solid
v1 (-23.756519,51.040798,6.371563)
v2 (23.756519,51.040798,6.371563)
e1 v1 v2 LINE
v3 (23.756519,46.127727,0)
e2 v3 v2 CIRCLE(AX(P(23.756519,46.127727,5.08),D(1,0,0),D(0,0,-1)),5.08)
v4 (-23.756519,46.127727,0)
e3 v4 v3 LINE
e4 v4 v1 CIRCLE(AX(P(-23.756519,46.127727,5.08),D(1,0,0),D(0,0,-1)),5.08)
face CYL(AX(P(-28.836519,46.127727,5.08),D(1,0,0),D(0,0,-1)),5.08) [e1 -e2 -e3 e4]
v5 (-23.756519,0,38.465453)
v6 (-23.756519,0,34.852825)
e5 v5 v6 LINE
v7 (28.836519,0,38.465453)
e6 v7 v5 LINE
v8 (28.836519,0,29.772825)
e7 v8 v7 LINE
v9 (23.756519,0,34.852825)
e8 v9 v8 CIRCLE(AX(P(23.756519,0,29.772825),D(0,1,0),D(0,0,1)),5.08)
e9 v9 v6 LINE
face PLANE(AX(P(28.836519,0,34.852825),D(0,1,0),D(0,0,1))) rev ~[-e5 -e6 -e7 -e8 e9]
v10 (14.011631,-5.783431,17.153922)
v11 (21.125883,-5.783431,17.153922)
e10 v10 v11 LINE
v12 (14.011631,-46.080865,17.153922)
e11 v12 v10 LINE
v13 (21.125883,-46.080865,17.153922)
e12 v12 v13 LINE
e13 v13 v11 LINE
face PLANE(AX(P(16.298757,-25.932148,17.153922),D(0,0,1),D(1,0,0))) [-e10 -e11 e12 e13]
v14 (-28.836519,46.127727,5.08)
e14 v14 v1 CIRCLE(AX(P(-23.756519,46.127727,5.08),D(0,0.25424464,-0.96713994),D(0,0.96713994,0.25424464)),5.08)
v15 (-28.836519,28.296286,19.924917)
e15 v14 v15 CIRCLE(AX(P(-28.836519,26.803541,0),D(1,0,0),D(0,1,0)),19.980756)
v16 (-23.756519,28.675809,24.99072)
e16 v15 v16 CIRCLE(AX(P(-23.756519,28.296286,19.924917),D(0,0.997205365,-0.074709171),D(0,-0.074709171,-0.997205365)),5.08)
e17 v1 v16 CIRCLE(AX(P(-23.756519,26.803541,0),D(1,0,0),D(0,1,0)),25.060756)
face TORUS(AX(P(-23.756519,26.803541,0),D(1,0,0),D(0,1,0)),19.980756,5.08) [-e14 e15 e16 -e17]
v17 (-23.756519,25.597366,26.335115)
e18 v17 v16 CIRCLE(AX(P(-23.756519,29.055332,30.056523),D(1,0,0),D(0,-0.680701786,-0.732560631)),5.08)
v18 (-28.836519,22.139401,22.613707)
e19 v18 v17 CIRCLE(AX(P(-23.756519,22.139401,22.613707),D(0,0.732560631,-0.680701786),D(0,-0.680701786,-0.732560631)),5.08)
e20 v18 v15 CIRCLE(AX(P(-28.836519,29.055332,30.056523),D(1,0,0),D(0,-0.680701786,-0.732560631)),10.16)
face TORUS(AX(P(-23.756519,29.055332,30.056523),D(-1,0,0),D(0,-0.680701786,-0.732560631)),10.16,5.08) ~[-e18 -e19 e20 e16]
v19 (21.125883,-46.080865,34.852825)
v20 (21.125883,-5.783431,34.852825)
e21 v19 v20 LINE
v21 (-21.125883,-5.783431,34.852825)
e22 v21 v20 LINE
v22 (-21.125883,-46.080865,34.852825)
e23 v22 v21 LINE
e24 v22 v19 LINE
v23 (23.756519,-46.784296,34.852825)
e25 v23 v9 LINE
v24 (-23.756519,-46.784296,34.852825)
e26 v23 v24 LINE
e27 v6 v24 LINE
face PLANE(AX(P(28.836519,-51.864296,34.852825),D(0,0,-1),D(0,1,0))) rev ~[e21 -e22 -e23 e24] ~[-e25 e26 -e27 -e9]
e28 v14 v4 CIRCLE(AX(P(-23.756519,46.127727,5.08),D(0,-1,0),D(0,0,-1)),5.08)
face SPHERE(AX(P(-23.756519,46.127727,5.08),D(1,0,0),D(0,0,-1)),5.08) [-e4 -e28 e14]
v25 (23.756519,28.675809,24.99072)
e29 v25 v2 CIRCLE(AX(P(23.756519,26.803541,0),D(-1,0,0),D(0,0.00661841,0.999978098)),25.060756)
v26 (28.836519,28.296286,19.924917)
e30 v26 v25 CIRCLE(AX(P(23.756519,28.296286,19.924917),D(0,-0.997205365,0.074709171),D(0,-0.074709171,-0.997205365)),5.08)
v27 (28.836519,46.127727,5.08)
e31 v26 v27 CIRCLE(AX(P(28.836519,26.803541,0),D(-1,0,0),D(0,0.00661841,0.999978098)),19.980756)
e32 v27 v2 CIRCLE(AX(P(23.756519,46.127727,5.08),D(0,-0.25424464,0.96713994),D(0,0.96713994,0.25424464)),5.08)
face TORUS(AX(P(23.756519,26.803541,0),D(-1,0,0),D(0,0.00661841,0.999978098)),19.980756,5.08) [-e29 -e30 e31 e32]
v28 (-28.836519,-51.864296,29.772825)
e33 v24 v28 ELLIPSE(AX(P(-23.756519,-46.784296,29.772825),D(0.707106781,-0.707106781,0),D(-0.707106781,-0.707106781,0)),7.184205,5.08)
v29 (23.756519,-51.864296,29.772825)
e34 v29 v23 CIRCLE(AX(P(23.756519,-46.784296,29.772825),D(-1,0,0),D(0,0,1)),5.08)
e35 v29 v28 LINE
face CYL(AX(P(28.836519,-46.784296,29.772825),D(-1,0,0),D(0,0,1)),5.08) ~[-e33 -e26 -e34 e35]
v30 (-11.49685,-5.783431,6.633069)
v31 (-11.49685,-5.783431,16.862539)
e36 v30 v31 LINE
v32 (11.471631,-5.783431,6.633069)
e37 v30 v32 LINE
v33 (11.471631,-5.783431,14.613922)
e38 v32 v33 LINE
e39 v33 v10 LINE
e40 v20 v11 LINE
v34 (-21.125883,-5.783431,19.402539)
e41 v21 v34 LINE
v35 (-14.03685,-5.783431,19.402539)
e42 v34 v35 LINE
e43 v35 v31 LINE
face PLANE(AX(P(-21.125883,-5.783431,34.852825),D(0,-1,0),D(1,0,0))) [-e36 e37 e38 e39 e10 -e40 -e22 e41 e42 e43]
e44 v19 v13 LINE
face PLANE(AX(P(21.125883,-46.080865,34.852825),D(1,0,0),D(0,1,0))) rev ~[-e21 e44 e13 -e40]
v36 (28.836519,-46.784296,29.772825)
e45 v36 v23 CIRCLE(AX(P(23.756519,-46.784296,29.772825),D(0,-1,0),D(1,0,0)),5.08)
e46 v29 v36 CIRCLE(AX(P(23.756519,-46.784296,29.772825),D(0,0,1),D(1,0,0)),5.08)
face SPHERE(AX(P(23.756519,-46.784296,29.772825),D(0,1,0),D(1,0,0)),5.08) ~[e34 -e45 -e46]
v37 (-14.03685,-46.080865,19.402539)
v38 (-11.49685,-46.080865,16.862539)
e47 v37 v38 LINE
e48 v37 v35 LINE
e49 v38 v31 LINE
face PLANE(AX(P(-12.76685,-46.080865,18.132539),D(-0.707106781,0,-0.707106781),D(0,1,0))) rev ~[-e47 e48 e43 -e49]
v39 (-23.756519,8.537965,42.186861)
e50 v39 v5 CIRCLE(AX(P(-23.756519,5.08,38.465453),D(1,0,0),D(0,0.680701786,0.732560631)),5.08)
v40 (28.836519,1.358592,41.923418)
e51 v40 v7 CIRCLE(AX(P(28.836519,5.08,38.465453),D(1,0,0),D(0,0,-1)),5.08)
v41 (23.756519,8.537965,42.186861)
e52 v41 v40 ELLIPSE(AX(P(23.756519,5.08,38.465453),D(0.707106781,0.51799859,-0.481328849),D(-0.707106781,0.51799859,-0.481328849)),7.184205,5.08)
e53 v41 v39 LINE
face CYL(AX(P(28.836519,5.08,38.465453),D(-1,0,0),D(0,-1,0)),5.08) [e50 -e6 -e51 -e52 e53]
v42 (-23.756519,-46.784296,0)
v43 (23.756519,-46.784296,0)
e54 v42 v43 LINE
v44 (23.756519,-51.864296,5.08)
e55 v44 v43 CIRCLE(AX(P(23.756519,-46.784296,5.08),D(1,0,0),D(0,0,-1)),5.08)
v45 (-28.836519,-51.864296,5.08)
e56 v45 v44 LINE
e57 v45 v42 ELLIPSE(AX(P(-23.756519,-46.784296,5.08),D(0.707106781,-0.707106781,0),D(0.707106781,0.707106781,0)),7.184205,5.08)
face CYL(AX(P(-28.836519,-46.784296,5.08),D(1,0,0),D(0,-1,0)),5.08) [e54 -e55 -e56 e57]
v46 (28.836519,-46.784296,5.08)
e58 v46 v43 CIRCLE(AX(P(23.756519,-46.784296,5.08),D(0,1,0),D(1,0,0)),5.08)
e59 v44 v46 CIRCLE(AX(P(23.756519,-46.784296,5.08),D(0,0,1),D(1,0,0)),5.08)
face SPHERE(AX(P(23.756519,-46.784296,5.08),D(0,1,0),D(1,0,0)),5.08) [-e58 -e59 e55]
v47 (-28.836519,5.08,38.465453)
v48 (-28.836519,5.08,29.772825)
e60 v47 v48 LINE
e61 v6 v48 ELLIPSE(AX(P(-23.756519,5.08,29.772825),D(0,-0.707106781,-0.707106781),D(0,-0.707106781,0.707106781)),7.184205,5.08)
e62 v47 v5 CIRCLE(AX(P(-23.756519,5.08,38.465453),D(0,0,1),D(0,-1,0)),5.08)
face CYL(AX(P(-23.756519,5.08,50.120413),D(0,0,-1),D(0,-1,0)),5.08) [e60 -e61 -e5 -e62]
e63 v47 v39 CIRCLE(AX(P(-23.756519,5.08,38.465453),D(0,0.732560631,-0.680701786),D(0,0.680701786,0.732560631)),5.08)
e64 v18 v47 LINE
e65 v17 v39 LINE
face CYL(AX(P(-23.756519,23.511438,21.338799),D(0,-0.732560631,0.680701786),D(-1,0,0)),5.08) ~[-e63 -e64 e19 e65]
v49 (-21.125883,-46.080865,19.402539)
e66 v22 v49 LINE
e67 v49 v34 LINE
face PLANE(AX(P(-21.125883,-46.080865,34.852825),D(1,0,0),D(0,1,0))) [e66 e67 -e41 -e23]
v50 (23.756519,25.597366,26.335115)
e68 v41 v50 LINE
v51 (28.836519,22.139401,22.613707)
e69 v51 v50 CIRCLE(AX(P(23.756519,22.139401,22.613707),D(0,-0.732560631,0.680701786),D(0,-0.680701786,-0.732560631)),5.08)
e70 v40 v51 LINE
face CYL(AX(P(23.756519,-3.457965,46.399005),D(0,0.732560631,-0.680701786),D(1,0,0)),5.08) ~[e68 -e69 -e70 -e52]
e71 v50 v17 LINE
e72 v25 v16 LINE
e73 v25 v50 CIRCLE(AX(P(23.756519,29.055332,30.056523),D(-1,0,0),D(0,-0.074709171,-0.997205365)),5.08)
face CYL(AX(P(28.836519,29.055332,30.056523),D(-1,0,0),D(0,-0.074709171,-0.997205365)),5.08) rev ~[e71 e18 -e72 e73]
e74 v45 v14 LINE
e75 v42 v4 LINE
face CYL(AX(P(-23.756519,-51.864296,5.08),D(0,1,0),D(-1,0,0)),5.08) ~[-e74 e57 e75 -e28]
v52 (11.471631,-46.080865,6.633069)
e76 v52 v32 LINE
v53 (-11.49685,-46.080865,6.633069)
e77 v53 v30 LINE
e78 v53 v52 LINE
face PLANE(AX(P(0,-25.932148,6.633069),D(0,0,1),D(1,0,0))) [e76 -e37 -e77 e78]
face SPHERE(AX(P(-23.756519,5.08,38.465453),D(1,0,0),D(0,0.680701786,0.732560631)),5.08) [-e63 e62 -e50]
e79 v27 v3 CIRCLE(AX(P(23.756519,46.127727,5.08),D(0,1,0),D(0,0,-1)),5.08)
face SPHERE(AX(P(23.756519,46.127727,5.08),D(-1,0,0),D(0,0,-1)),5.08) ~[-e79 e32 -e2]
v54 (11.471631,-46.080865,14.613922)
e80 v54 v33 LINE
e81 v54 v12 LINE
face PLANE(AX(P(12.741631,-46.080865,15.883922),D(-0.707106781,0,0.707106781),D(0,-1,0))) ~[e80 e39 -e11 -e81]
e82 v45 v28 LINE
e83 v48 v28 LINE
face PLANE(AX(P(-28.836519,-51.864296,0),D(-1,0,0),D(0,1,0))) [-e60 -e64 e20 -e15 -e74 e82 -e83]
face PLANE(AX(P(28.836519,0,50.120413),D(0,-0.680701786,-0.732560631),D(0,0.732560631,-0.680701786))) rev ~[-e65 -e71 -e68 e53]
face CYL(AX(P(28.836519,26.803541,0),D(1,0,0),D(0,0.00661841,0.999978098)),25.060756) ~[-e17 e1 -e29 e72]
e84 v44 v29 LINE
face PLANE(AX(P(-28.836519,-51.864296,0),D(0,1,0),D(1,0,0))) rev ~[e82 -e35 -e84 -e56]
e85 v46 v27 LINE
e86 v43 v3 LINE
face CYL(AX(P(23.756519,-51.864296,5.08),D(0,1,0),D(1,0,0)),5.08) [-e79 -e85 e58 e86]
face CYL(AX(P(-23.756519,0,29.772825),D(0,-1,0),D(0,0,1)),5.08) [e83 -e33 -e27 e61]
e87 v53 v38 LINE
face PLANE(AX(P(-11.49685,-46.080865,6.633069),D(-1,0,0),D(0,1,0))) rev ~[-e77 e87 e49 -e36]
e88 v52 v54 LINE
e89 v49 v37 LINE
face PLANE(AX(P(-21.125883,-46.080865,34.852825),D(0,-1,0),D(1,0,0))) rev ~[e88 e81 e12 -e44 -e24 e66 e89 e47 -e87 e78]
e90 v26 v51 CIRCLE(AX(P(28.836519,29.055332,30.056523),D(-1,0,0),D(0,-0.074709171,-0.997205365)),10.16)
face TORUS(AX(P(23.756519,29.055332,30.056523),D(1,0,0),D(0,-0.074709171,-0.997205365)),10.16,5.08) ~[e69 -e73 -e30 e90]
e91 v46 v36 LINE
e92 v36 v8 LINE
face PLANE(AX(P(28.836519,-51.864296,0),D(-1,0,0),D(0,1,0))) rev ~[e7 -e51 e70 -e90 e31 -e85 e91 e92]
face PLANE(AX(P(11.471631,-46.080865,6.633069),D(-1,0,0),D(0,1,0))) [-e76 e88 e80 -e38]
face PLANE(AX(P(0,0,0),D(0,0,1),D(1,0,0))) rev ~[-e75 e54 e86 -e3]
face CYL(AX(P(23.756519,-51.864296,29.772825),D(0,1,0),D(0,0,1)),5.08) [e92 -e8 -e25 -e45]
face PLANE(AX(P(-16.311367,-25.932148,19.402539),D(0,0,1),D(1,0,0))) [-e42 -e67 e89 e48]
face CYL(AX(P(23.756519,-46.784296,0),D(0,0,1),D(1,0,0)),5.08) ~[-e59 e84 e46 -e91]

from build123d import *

# Parameters (mm, degrees)
F0_W     = 57.6730370522
F0_H     = 103.7285923958
F1_DEPTH = 50.1204133034
F2_W     = 51.8642961979
F2_H     = 15.2675881982
F3_DEPTH = 280.9666395187
F4_W     = 42.251765728
F4_H     = 40.2974346653
F5_DEPTH = 28.219755739
F6_W     = 9.6290325746
F6_H     = 40.2974346653
F7_DEPTH = 12.7694699913
F8_W     = 9.6542518586
F8_H     = 40.2974346653
F9_DEPTH = 10.5208531022
F10_R    = 5.08
F11_SIZE = 2.54


with BuildPart() as f1:
    # F0 (on Top) → F1 (new body)
    with BuildSketch(Plane.XY):
        Rectangle(F0_W, F0_H)
    extrude(amount=F1_DEPTH)

    # F2 (on face) → F3 (cut)
    with BuildSketch(Plane.YZ.offset(28.8365185261)):
        with BuildLine():
            ThreePointArc((26.9694030285, 25.0602066517), (44.5827153367, 17.6618916268), (51.8642961979, 0))
            Line((51.8642961979, 0), (51.8642961979, 50.1204133034))
            Line((51.8642961979, 50.1204133034), (0, 50.1204133034))
            Line((0, 50.1204133034), (26.9694030285, 25.0602066517))
        make_face()
        with Locations((-25.9321480989, 42.4866192043)):
            Rectangle(F2_W, F2_H)
    extrude(amount=-F3_DEPTH, mode=Mode.SUBTRACT)

    # F4 (on face) → F5 (cut)
    with BuildSketch(Plane.XY.offset(34.8528251052)):
        with Locations((0, -25.9321480989)):
            Rectangle(F4_W, F4_H)
    extrude(amount=-F5_DEPTH, mode=Mode.SUBTRACT)

    # F6 (on face) → F7 (join)
    with BuildSketch(Plane.XY.offset(6.6330693662)):
        with Locations((-16.3113665767, -25.9321480989)):
            Rectangle(F6_W, F6_H)
    extrude(amount=F7_DEPTH)

    # F8 (on face) → F9 (join)
    with BuildSketch(Plane.XY.offset(6.6330693662)):
        with Locations((16.2987569347, -25.9321480989)):
            Rectangle(F8_W, F8_H)
    extrude(amount=F9_DEPTH)

    # F10
    f10_edges = [f1.edges().sort_by_distance(p)[0] for p in [
        (28.836519, 44.582715, 17.661892),
        (28.836519, 13.484702, 37.59031),
        (0, 26.969403, 25.060207),
        (-28.836519, 13.484702, 37.59031),
        (-28.836519, 44.582715, 17.661892),
        (0, 51.864296, 0),
        (28.836519, 0, 0),
        (28.836519, -25.932148, 34.852825),
        (28.836519, -51.864296, 17.426413),
        (-28.836519, -25.932148, 34.852825),
        (0, -51.864296, 34.852825),
        (0, -51.864296, 0),
        (-28.836519, 0, 0),
        (-28.836519, 0, 42.486619),
        (0, 0, 50.120413),
    ]]
    fillet(f10_edges, radius=F10_R)

    # F11
    f11_edges = [f1.edges().sort_by_distance(p)[0] for p in [
        (-11.49685, -25.932148, 19.402539),
        (11.471631, -25.932148, 17.153922),
    ]]
    chamfer(f11_edges, length=F11_SIZE)


solid = f1.part
